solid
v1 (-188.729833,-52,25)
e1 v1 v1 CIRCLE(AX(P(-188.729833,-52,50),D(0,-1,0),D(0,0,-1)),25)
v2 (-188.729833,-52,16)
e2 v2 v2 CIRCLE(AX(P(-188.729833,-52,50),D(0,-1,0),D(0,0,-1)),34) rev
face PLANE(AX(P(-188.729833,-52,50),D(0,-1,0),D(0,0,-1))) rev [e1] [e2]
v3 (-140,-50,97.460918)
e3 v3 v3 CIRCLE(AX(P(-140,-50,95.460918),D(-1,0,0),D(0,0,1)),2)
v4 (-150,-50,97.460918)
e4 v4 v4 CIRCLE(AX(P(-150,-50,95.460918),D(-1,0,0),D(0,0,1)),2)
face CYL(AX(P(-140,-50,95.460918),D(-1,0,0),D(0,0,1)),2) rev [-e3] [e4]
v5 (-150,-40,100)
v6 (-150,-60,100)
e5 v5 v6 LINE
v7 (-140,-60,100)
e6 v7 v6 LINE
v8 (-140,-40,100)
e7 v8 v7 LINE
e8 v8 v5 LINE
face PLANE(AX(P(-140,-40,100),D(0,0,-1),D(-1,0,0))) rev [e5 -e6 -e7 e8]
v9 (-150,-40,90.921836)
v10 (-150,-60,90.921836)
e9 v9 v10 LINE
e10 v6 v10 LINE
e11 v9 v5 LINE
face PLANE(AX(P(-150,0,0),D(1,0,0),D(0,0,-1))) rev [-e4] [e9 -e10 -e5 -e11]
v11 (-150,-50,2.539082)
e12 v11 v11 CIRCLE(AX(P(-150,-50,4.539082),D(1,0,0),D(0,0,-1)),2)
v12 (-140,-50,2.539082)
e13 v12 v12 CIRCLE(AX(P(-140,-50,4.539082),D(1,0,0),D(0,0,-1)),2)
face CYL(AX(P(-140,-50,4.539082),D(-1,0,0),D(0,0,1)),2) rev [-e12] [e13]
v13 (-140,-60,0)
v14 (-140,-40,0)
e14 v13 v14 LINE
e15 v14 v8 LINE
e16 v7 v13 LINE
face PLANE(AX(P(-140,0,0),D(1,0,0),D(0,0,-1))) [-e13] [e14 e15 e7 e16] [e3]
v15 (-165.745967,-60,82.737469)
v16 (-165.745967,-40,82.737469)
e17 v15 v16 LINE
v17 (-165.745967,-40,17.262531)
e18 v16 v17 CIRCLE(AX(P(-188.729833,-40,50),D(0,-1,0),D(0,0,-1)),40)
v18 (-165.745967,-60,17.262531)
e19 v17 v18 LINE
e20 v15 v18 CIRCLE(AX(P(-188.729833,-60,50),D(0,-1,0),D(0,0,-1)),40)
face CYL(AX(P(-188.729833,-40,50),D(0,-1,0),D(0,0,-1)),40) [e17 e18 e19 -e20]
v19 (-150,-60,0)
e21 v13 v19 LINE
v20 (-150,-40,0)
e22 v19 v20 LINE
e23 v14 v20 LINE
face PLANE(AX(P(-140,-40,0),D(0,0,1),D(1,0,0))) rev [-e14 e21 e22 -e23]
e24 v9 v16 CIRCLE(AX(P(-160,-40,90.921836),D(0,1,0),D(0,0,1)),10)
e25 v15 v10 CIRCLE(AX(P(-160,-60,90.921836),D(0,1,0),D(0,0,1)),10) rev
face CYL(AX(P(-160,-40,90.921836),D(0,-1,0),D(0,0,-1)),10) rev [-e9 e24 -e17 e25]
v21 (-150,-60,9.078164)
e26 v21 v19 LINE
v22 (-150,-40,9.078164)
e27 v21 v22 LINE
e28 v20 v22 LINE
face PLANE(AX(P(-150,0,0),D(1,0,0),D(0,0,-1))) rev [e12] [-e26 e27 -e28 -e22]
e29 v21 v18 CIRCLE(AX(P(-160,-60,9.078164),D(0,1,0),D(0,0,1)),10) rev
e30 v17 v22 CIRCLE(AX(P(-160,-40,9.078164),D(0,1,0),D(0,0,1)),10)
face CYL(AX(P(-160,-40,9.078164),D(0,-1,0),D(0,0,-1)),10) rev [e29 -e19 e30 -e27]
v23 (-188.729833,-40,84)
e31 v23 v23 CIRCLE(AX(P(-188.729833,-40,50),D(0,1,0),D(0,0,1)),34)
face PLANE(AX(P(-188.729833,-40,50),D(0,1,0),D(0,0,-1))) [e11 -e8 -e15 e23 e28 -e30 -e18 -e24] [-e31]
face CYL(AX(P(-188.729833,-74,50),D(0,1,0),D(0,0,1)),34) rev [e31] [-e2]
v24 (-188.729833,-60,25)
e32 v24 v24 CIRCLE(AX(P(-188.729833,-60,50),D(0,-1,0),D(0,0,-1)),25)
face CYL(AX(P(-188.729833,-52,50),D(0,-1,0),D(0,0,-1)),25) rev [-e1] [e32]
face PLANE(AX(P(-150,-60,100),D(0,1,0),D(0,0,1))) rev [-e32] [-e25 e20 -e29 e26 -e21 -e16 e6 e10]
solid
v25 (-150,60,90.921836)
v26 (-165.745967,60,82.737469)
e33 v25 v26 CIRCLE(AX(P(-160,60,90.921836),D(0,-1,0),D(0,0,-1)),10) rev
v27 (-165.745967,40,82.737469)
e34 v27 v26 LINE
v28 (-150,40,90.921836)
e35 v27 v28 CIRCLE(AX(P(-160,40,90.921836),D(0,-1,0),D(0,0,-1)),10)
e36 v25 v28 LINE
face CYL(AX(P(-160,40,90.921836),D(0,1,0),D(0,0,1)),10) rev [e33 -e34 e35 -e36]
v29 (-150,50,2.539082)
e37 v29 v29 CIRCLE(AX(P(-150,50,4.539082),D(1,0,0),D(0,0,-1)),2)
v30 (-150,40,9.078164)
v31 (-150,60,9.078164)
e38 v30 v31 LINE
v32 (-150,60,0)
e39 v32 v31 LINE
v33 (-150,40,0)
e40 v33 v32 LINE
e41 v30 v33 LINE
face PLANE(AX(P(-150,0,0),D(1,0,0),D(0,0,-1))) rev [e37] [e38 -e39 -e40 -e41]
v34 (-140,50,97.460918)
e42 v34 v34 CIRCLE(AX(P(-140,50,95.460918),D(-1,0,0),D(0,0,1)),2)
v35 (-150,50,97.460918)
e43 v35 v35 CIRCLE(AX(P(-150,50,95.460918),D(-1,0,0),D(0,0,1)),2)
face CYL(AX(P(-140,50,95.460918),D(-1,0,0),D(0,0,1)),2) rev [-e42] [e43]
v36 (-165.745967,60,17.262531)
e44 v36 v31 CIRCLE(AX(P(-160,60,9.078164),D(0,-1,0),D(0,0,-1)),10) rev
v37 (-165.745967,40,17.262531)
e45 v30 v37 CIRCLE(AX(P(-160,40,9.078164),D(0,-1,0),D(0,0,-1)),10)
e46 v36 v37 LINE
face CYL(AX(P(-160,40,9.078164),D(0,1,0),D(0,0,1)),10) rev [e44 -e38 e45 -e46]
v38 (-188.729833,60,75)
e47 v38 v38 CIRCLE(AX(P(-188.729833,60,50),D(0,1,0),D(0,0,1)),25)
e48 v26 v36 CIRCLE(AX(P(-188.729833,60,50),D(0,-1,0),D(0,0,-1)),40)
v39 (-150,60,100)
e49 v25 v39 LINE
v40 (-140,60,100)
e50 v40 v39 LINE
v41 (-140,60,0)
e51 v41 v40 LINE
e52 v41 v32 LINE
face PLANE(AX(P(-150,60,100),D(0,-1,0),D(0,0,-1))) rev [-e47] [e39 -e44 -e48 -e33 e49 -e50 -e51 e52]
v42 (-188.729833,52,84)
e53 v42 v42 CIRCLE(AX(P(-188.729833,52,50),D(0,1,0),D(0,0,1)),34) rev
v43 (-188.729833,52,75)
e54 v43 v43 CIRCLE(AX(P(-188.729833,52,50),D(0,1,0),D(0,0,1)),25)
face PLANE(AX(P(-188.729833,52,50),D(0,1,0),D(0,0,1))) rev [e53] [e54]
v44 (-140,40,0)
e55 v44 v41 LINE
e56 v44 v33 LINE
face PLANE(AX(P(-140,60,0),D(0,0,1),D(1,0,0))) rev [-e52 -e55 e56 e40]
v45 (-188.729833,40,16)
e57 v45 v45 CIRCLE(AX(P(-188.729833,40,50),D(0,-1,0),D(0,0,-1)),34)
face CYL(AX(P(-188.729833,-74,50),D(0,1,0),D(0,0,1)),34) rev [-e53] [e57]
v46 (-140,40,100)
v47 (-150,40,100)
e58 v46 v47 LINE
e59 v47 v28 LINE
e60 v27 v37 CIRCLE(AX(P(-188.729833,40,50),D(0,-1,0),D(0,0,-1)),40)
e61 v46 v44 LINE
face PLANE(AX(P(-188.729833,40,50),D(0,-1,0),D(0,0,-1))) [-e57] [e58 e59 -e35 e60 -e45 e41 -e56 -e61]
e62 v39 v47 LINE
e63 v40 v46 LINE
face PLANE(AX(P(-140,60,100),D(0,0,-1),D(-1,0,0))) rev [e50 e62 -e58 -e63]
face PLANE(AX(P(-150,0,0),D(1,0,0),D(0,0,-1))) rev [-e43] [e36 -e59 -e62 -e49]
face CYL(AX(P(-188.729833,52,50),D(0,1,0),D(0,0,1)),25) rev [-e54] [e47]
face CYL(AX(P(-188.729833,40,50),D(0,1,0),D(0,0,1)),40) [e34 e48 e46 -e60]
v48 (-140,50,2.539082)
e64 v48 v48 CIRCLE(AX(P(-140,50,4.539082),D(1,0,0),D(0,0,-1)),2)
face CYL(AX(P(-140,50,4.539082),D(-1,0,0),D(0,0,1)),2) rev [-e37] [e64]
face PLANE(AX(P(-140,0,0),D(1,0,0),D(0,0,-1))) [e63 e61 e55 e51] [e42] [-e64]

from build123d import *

# Parameters (mm, degrees)
SKETCH_1_W                                = 300
SKETCH_1_H                                = 120
EXTRUDE_1_DEPTH                           = 100
EXTRUDE_2_DEPTH                           = 20
FILLET_2_R                                = 10
FILLET_3_R                                = 10
MIRROR_6_AT_THE_SECOND_PLANE_COPY_1_DEPTH = 20
FILLET_10_R                               = 10
FILLET_11_R                               = 10
FILLET_12_R                               = 10
FILLET_13_R                               = 10
FILLET_14_R                               = 10
FILLET_15_R                               = 10
CUT_EXTRUDE_1_REACH                       = 258.744
PATTERN_LINEAR_1_COUNT                    = 4
PATTERN_LINEAR_1_PITCH                    = 40
PATTERN_LINEAR_1_COL_COUNT                = 4
PATTERN_LINEAR_1_COL_PITCH                = 40
SKETCH_4_R                                = 30
EXTRUDE_3_DEPTH                           = 14
SKETCH_6_R                                = 34
CUT_EXTRUDE_2_DEPTH                       = 284.325496056
FILLET_16_R                               = 5
CUT_EXTRUDE_3_REACH                       = 276.433
SKETCH_7_R                                = 2
PATTERN_CIRCULAR_1_COUNT                  = 6
SKETCH_8_W                                = 104.728180427
SKETCH_8_H                                = 147.280084006
CUT_EXTRUDE_4_DEPTH                       = 399.638039773
SKETCH_9_W                                = 100
SKETCH_9_H                                = 20
EXTRUDE_4_DEPTH                           = 10
SKETCH_10_W                               = 100
SKETCH_10_H                               = 20
EXTRUDE_5_DEPTH                           = 10
SKETCH_11_R                               = 2
CUT_EXTRUDE_5_DEPTH                       = 141.706739984
MIRROR_START                              = -150
MIRROR_8_OUTLINE_R                        = 2
MIRROR_8_DEPTH                            = 10
SKETCH_12_R                               = 2
CUT_EXTRUDE_6_DEPTH                       = 141.706739984
SKETCH_14_R                               = 34
SKETCH_14_R_2                             = 25
EXTRUDE_6_DEPTH                           = 8
SKETCH_15_R                               = 34
SKETCH_15_R_2                             = 25
EXTRUDE_7_DEPTH                           = 8


# Read off the part's stored shape, not the designer's step: 镜向8
with BuildPart() as part:
    # 草图1 → 凸台-拉伸1 (new body)
    with BuildSketch(Plane.XY):
        Rectangle(SKETCH_1_W, SKETCH_1_H)
    extrude(amount=EXTRUDE_1_DEPTH)

    # 草图2 → 凸台-拉伸2 (add)
    with BuildSketch(Plane(origin=(0, 60, 0), x_dir=(1, 0, 0), z_dir=(0, 1, 0))):
        with BuildLine():
            Line((150, -50), (150, -40))
            ThreePointArc((150, -40), (228.729833462, -50), (150, -60))
            Line((150, -60), (150, -50))
        make_face()
    extrude_2 = extrude(amount=-EXTRUDE_2_DEPTH)

    # 圆角2
    fillet_2_edges = [part.edges().sort_by_distance(p)[0] for p in [
        (150, 50, 40),
    ]]
    fillet(fillet_2_edges, radius=FILLET_2_R)

    # 圆角3
    fillet_3_edges = [part.edges().sort_by_distance(p)[0] for p in [
        (150, 50, 60),
    ]]
    fillet(fillet_3_edges, radius=FILLET_3_R)

    # 镜向6: 凸台-拉伸2 across plane
    add(extrude_2.mirror(Plane(origin=(0, 0, 0), x_dir=(0, 0, 1), z_dir=(1, 0, 0))))

    # 镜向6 at the second plane: 凸台-拉伸2 across plane
    add(extrude_2.mirror(Plane.ZX))

    # 镜向6 at the second plane copy 1 sket → 镜向6 at the second plane copy 1 (add)
    with BuildSketch(Plane(origin=(0, -60, 0), x_dir=(-1, 0, 0), z_dir=(0, -1, 0))):
        with BuildLine():
            Line((150, -50), (150, -40))
            ThreePointArc((150, -40), (228.729833462, -50), (150, -60))
            Line((150, -60), (150, -50))
        make_face()
    extrude(amount=-MIRROR_6_AT_THE_SECOND_PLANE_COPY_1_DEPTH)

    # 圆角10
    fillet_10_edges = [part.edges().sort_by_distance(p)[0] for p in [
        (150, -50, 60),
    ]]
    fillet(fillet_10_edges, radius=FILLET_10_R)

    # 圆角11
    fillet_11_edges = [part.edges().sort_by_distance(p)[0] for p in [
        (150, -50, 40),
    ]]
    fillet(fillet_11_edges, radius=FILLET_11_R)

    # 圆角12
    fillet_12_edges = [part.edges().sort_by_distance(p)[0] for p in [
        (-150, 50, 40),
    ]]
    fillet(fillet_12_edges, radius=FILLET_12_R)

    # 圆角13
    fillet_13_edges = [part.edges().sort_by_distance(p)[0] for p in [
        (-150, -50, 60),
    ]]
    fillet(fillet_13_edges, radius=FILLET_13_R)

    # 圆角14
    fillet_14_edges = [part.edges().sort_by_distance(p)[0] for p in [
        (-150, 50, 60),
    ]]
    fillet(fillet_14_edges, radius=FILLET_14_R)

    # 圆角15
    fillet_15_edges = [part.edges().sort_by_distance(p)[0] for p in [
        (-150, -50, 40),
    ]]
    fillet(fillet_15_edges, radius=FILLET_15_R)

    # 草图3 → 切除-拉伸1 (cut, up to next)
    with BuildSketch(Plane.XY.offset(100), mode=Mode.PRIVATE) as cut_extrude_1_sk1:
        with BuildLine():
            Line((-11.916195323, -32.511613), (-11.916195323, 32.511613))
            ThreePointArc((-11.916195323, 32.511613), (0, 44.427808323), (11.916195323, 32.511613))
            Line((11.916195323, 32.511613), (11.916195323, -32.511613))
            ThreePointArc((11.916195323, -32.511613), (0, -44.427808323), (-11.916195323, -32.511613))
        make_face()
    cut_extrude_1_tool1 = extrude(cut_extrude_1_sk1.sketch, amount=-CUT_EXTRUDE_1_REACH, mode=Mode.PRIVATE) & part.part
    cut_extrude_1 = cut_extrude_1_tool1.solids().sort_by_distance((0, 0, 100))[0]
    add(cut_extrude_1, mode=Mode.SUBTRACT)

    # 阵列(线性)1: 切除-拉伸1 ×4
    with Locations(*[(i * PATTERN_LINEAR_1_PITCH, 0, 0) for i in range(1, PATTERN_LINEAR_1_COUNT)]):
        add(cut_extrude_1, mode=Mode.SUBTRACT)

    # 阵列(线性)1 col: 切除-拉伸1 ×4
    with Locations(*[(-i * PATTERN_LINEAR_1_COL_PITCH, 0, 0) for i in range(1, PATTERN_LINEAR_1_COL_COUNT)]):
        add(cut_extrude_1, mode=Mode.SUBTRACT)

    # 草图4 → 凸台-拉伸3 (add)
    with BuildSketch(Plane.XZ.offset(60)):
        with Locations(Location((188.729833462, 50, 0), (0, 0, 90))):
            Circle(SKETCH_4_R)
    extrude(amount=EXTRUDE_3_DEPTH)

    # 草图6 → 切除-拉伸2 (cut, through all)
    with BuildSketch(Plane(origin=(0, 60, 0), x_dir=(1, 0, 0), z_dir=(0, 1, 0))):
        with Locations(Location((-188.729833462, -50, 0), (0, 0, 270))):
            Circle(SKETCH_6_R)
    extrude(amount=-CUT_EXTRUDE_2_DEPTH, mode=Mode.SUBTRACT)

    # 圆角16
    fillet_16_edges = [part.edges().sort_by_distance(p)[0] for p in [
        (-150, 0, 100),
        (0, -60, 100),
        (150, 0, 100),
        (0, -60, 0),
        (-150, 0, 0),
        (0, 60, 0),
        (150, 0, 0),
        (0, 60, 100),
    ]]
    fillet(fillet_16_edges, radius=FILLET_16_R)

    # 草图7 → 切除-拉伸3 (cut, up to next)
    with BuildSketch(Plane.XZ.offset(-40), mode=Mode.PRIVATE) as cut_extrude_3_sk1:
        with Locations(Location((188.729833462, 84.5, 0), (0, 0, 270))):
            Circle(SKETCH_7_R)
    cut_extrude_3_tool1 = extrude(cut_extrude_3_sk1.sketch, amount=-CUT_EXTRUDE_3_REACH, mode=Mode.PRIVATE) & part.part
    cut_extrude_3 = cut_extrude_3_tool1.solids().sort_by_distance((188.729833, 40, 84.5))[0]
    add(cut_extrude_3, mode=Mode.SUBTRACT)

    # 阵列(圆周)1: 切除-拉伸3 ×6 about axis
    pattern_circular_1_axis = Axis((188.729833462, 0, 50), (0, 1, 0))
    for i in range(1, PATTERN_CIRCULAR_1_COUNT):
        add(cut_extrude_3.rotate(pattern_circular_1_axis, i * 360 / PATTERN_CIRCULAR_1_COUNT), mode=Mode.SUBTRACT)

    # 草图8 → 切除-拉伸4 (cut, through all)
    with BuildSketch(Plane.ZY.offset(150)):
        with Locations((52.364090214, -7.105652858)):
            Rectangle(SKETCH_8_W, SKETCH_8_H)
    extrude(amount=-CUT_EXTRUDE_4_DEPTH, mode=Mode.SUBTRACT)


with BuildPart() as cut_extrude_4_piece_1:
    # of the separate pieces the step leaves, piece 1, a body of its own (cut_extrude_4_pieces)
    add(part.part.solids().sort_by_distance((-150, -60, 9.078163907))[0])

    # 草图10 → 凸台-拉伸5 (add)
    with BuildSketch(Plane(origin=(-150, 0, 0), x_dir=(0, 0, -1), z_dir=(1, 0, 0))):
        with Locations((-50, -50)):
            Rectangle(SKETCH_10_W, SKETCH_10_H)
    extrude(amount=EXTRUDE_5_DEPTH)

    # 草图11 → 切除-拉伸5 (cut, through all)
    with BuildSketch(Plane.ZY.offset(150)):
        with Locations((95.460918047, -50)):
            Circle(SKETCH_11_R)
    extrude(amount=-CUT_EXTRUDE_5_DEPTH, mode=Mode.SUBTRACT)

    # 镜向8 outline → 镜向8 (cut)
    with BuildSketch(Plane.YZ.offset(MIRROR_START)):
        with Locations((-50, 4.539081953)):
            Circle(MIRROR_8_OUTLINE_R)
    extrude(amount=MIRROR_8_DEPTH, mode=Mode.SUBTRACT)

    # 草图14 → 凸台-拉伸6 (add)
    with BuildSketch(Plane(origin=(0, -60, 0), x_dir=(-1, 0, 0), z_dir=(0, -1, 0))):
        with Locations(Location((188.729833462, -50, 0), (0, 0, 270))):
            Circle(SKETCH_14_R)
        with Locations(Location((188.729833462, -50, 0), (0, 0, 90))):
            Circle(SKETCH_14_R_2, mode=Mode.SUBTRACT)
    extrude(amount=-EXTRUDE_6_DEPTH)


with BuildPart() as cut_extrude_4_piece_2:
    # of the separate pieces the step leaves, piece 2, a body of its own (cut_extrude_4_pieces)
    add(part.part.solids().sort_by_distance((-150, 60, 9.078163907))[0])

    # 草图9 → 凸台-拉伸4 (add)
    with BuildSketch(Plane(origin=(-150, 0, 0), x_dir=(0, 0, -1), z_dir=(1, 0, 0))):
        with Locations((-50, 50)):
            Rectangle(SKETCH_9_W, SKETCH_9_H)
    extrude(amount=EXTRUDE_4_DEPTH)

    # 草图12 → 切除-拉伸6 (cut, through all)
    with BuildSketch(Plane.ZY.offset(150)):
        with Locations((95.460918047, 50)):
            Circle(SKETCH_12_R)
    cut_extrude_6 = extrude(amount=-CUT_EXTRUDE_6_DEPTH, mode=Mode.SUBTRACT)

    # 镜向10: 切除-拉伸6 across plane
    add(cut_extrude_6.mirror(Plane.XY.offset(50)), mode=Mode.SUBTRACT)

    # 草图15 → 凸台-拉伸7 (add)
    with BuildSketch(Plane(origin=(0, 60, 0), x_dir=(1, 0, 0), z_dir=(0, 1, 0))):
        with Locations(Location((-188.729833462, -50, 0), (0, 0, 270))):
            Circle(SKETCH_15_R)
        with Locations(Location((-188.729833462, -50, 0), (0, 0, 270))):
            Circle(SKETCH_15_R_2, mode=Mode.SUBTRACT)
    extrude(amount=-EXTRUDE_7_DEPTH)


solid = Compound([cut_extrude_4_piece_1.part, cut_extrude_4_piece_2.part])
